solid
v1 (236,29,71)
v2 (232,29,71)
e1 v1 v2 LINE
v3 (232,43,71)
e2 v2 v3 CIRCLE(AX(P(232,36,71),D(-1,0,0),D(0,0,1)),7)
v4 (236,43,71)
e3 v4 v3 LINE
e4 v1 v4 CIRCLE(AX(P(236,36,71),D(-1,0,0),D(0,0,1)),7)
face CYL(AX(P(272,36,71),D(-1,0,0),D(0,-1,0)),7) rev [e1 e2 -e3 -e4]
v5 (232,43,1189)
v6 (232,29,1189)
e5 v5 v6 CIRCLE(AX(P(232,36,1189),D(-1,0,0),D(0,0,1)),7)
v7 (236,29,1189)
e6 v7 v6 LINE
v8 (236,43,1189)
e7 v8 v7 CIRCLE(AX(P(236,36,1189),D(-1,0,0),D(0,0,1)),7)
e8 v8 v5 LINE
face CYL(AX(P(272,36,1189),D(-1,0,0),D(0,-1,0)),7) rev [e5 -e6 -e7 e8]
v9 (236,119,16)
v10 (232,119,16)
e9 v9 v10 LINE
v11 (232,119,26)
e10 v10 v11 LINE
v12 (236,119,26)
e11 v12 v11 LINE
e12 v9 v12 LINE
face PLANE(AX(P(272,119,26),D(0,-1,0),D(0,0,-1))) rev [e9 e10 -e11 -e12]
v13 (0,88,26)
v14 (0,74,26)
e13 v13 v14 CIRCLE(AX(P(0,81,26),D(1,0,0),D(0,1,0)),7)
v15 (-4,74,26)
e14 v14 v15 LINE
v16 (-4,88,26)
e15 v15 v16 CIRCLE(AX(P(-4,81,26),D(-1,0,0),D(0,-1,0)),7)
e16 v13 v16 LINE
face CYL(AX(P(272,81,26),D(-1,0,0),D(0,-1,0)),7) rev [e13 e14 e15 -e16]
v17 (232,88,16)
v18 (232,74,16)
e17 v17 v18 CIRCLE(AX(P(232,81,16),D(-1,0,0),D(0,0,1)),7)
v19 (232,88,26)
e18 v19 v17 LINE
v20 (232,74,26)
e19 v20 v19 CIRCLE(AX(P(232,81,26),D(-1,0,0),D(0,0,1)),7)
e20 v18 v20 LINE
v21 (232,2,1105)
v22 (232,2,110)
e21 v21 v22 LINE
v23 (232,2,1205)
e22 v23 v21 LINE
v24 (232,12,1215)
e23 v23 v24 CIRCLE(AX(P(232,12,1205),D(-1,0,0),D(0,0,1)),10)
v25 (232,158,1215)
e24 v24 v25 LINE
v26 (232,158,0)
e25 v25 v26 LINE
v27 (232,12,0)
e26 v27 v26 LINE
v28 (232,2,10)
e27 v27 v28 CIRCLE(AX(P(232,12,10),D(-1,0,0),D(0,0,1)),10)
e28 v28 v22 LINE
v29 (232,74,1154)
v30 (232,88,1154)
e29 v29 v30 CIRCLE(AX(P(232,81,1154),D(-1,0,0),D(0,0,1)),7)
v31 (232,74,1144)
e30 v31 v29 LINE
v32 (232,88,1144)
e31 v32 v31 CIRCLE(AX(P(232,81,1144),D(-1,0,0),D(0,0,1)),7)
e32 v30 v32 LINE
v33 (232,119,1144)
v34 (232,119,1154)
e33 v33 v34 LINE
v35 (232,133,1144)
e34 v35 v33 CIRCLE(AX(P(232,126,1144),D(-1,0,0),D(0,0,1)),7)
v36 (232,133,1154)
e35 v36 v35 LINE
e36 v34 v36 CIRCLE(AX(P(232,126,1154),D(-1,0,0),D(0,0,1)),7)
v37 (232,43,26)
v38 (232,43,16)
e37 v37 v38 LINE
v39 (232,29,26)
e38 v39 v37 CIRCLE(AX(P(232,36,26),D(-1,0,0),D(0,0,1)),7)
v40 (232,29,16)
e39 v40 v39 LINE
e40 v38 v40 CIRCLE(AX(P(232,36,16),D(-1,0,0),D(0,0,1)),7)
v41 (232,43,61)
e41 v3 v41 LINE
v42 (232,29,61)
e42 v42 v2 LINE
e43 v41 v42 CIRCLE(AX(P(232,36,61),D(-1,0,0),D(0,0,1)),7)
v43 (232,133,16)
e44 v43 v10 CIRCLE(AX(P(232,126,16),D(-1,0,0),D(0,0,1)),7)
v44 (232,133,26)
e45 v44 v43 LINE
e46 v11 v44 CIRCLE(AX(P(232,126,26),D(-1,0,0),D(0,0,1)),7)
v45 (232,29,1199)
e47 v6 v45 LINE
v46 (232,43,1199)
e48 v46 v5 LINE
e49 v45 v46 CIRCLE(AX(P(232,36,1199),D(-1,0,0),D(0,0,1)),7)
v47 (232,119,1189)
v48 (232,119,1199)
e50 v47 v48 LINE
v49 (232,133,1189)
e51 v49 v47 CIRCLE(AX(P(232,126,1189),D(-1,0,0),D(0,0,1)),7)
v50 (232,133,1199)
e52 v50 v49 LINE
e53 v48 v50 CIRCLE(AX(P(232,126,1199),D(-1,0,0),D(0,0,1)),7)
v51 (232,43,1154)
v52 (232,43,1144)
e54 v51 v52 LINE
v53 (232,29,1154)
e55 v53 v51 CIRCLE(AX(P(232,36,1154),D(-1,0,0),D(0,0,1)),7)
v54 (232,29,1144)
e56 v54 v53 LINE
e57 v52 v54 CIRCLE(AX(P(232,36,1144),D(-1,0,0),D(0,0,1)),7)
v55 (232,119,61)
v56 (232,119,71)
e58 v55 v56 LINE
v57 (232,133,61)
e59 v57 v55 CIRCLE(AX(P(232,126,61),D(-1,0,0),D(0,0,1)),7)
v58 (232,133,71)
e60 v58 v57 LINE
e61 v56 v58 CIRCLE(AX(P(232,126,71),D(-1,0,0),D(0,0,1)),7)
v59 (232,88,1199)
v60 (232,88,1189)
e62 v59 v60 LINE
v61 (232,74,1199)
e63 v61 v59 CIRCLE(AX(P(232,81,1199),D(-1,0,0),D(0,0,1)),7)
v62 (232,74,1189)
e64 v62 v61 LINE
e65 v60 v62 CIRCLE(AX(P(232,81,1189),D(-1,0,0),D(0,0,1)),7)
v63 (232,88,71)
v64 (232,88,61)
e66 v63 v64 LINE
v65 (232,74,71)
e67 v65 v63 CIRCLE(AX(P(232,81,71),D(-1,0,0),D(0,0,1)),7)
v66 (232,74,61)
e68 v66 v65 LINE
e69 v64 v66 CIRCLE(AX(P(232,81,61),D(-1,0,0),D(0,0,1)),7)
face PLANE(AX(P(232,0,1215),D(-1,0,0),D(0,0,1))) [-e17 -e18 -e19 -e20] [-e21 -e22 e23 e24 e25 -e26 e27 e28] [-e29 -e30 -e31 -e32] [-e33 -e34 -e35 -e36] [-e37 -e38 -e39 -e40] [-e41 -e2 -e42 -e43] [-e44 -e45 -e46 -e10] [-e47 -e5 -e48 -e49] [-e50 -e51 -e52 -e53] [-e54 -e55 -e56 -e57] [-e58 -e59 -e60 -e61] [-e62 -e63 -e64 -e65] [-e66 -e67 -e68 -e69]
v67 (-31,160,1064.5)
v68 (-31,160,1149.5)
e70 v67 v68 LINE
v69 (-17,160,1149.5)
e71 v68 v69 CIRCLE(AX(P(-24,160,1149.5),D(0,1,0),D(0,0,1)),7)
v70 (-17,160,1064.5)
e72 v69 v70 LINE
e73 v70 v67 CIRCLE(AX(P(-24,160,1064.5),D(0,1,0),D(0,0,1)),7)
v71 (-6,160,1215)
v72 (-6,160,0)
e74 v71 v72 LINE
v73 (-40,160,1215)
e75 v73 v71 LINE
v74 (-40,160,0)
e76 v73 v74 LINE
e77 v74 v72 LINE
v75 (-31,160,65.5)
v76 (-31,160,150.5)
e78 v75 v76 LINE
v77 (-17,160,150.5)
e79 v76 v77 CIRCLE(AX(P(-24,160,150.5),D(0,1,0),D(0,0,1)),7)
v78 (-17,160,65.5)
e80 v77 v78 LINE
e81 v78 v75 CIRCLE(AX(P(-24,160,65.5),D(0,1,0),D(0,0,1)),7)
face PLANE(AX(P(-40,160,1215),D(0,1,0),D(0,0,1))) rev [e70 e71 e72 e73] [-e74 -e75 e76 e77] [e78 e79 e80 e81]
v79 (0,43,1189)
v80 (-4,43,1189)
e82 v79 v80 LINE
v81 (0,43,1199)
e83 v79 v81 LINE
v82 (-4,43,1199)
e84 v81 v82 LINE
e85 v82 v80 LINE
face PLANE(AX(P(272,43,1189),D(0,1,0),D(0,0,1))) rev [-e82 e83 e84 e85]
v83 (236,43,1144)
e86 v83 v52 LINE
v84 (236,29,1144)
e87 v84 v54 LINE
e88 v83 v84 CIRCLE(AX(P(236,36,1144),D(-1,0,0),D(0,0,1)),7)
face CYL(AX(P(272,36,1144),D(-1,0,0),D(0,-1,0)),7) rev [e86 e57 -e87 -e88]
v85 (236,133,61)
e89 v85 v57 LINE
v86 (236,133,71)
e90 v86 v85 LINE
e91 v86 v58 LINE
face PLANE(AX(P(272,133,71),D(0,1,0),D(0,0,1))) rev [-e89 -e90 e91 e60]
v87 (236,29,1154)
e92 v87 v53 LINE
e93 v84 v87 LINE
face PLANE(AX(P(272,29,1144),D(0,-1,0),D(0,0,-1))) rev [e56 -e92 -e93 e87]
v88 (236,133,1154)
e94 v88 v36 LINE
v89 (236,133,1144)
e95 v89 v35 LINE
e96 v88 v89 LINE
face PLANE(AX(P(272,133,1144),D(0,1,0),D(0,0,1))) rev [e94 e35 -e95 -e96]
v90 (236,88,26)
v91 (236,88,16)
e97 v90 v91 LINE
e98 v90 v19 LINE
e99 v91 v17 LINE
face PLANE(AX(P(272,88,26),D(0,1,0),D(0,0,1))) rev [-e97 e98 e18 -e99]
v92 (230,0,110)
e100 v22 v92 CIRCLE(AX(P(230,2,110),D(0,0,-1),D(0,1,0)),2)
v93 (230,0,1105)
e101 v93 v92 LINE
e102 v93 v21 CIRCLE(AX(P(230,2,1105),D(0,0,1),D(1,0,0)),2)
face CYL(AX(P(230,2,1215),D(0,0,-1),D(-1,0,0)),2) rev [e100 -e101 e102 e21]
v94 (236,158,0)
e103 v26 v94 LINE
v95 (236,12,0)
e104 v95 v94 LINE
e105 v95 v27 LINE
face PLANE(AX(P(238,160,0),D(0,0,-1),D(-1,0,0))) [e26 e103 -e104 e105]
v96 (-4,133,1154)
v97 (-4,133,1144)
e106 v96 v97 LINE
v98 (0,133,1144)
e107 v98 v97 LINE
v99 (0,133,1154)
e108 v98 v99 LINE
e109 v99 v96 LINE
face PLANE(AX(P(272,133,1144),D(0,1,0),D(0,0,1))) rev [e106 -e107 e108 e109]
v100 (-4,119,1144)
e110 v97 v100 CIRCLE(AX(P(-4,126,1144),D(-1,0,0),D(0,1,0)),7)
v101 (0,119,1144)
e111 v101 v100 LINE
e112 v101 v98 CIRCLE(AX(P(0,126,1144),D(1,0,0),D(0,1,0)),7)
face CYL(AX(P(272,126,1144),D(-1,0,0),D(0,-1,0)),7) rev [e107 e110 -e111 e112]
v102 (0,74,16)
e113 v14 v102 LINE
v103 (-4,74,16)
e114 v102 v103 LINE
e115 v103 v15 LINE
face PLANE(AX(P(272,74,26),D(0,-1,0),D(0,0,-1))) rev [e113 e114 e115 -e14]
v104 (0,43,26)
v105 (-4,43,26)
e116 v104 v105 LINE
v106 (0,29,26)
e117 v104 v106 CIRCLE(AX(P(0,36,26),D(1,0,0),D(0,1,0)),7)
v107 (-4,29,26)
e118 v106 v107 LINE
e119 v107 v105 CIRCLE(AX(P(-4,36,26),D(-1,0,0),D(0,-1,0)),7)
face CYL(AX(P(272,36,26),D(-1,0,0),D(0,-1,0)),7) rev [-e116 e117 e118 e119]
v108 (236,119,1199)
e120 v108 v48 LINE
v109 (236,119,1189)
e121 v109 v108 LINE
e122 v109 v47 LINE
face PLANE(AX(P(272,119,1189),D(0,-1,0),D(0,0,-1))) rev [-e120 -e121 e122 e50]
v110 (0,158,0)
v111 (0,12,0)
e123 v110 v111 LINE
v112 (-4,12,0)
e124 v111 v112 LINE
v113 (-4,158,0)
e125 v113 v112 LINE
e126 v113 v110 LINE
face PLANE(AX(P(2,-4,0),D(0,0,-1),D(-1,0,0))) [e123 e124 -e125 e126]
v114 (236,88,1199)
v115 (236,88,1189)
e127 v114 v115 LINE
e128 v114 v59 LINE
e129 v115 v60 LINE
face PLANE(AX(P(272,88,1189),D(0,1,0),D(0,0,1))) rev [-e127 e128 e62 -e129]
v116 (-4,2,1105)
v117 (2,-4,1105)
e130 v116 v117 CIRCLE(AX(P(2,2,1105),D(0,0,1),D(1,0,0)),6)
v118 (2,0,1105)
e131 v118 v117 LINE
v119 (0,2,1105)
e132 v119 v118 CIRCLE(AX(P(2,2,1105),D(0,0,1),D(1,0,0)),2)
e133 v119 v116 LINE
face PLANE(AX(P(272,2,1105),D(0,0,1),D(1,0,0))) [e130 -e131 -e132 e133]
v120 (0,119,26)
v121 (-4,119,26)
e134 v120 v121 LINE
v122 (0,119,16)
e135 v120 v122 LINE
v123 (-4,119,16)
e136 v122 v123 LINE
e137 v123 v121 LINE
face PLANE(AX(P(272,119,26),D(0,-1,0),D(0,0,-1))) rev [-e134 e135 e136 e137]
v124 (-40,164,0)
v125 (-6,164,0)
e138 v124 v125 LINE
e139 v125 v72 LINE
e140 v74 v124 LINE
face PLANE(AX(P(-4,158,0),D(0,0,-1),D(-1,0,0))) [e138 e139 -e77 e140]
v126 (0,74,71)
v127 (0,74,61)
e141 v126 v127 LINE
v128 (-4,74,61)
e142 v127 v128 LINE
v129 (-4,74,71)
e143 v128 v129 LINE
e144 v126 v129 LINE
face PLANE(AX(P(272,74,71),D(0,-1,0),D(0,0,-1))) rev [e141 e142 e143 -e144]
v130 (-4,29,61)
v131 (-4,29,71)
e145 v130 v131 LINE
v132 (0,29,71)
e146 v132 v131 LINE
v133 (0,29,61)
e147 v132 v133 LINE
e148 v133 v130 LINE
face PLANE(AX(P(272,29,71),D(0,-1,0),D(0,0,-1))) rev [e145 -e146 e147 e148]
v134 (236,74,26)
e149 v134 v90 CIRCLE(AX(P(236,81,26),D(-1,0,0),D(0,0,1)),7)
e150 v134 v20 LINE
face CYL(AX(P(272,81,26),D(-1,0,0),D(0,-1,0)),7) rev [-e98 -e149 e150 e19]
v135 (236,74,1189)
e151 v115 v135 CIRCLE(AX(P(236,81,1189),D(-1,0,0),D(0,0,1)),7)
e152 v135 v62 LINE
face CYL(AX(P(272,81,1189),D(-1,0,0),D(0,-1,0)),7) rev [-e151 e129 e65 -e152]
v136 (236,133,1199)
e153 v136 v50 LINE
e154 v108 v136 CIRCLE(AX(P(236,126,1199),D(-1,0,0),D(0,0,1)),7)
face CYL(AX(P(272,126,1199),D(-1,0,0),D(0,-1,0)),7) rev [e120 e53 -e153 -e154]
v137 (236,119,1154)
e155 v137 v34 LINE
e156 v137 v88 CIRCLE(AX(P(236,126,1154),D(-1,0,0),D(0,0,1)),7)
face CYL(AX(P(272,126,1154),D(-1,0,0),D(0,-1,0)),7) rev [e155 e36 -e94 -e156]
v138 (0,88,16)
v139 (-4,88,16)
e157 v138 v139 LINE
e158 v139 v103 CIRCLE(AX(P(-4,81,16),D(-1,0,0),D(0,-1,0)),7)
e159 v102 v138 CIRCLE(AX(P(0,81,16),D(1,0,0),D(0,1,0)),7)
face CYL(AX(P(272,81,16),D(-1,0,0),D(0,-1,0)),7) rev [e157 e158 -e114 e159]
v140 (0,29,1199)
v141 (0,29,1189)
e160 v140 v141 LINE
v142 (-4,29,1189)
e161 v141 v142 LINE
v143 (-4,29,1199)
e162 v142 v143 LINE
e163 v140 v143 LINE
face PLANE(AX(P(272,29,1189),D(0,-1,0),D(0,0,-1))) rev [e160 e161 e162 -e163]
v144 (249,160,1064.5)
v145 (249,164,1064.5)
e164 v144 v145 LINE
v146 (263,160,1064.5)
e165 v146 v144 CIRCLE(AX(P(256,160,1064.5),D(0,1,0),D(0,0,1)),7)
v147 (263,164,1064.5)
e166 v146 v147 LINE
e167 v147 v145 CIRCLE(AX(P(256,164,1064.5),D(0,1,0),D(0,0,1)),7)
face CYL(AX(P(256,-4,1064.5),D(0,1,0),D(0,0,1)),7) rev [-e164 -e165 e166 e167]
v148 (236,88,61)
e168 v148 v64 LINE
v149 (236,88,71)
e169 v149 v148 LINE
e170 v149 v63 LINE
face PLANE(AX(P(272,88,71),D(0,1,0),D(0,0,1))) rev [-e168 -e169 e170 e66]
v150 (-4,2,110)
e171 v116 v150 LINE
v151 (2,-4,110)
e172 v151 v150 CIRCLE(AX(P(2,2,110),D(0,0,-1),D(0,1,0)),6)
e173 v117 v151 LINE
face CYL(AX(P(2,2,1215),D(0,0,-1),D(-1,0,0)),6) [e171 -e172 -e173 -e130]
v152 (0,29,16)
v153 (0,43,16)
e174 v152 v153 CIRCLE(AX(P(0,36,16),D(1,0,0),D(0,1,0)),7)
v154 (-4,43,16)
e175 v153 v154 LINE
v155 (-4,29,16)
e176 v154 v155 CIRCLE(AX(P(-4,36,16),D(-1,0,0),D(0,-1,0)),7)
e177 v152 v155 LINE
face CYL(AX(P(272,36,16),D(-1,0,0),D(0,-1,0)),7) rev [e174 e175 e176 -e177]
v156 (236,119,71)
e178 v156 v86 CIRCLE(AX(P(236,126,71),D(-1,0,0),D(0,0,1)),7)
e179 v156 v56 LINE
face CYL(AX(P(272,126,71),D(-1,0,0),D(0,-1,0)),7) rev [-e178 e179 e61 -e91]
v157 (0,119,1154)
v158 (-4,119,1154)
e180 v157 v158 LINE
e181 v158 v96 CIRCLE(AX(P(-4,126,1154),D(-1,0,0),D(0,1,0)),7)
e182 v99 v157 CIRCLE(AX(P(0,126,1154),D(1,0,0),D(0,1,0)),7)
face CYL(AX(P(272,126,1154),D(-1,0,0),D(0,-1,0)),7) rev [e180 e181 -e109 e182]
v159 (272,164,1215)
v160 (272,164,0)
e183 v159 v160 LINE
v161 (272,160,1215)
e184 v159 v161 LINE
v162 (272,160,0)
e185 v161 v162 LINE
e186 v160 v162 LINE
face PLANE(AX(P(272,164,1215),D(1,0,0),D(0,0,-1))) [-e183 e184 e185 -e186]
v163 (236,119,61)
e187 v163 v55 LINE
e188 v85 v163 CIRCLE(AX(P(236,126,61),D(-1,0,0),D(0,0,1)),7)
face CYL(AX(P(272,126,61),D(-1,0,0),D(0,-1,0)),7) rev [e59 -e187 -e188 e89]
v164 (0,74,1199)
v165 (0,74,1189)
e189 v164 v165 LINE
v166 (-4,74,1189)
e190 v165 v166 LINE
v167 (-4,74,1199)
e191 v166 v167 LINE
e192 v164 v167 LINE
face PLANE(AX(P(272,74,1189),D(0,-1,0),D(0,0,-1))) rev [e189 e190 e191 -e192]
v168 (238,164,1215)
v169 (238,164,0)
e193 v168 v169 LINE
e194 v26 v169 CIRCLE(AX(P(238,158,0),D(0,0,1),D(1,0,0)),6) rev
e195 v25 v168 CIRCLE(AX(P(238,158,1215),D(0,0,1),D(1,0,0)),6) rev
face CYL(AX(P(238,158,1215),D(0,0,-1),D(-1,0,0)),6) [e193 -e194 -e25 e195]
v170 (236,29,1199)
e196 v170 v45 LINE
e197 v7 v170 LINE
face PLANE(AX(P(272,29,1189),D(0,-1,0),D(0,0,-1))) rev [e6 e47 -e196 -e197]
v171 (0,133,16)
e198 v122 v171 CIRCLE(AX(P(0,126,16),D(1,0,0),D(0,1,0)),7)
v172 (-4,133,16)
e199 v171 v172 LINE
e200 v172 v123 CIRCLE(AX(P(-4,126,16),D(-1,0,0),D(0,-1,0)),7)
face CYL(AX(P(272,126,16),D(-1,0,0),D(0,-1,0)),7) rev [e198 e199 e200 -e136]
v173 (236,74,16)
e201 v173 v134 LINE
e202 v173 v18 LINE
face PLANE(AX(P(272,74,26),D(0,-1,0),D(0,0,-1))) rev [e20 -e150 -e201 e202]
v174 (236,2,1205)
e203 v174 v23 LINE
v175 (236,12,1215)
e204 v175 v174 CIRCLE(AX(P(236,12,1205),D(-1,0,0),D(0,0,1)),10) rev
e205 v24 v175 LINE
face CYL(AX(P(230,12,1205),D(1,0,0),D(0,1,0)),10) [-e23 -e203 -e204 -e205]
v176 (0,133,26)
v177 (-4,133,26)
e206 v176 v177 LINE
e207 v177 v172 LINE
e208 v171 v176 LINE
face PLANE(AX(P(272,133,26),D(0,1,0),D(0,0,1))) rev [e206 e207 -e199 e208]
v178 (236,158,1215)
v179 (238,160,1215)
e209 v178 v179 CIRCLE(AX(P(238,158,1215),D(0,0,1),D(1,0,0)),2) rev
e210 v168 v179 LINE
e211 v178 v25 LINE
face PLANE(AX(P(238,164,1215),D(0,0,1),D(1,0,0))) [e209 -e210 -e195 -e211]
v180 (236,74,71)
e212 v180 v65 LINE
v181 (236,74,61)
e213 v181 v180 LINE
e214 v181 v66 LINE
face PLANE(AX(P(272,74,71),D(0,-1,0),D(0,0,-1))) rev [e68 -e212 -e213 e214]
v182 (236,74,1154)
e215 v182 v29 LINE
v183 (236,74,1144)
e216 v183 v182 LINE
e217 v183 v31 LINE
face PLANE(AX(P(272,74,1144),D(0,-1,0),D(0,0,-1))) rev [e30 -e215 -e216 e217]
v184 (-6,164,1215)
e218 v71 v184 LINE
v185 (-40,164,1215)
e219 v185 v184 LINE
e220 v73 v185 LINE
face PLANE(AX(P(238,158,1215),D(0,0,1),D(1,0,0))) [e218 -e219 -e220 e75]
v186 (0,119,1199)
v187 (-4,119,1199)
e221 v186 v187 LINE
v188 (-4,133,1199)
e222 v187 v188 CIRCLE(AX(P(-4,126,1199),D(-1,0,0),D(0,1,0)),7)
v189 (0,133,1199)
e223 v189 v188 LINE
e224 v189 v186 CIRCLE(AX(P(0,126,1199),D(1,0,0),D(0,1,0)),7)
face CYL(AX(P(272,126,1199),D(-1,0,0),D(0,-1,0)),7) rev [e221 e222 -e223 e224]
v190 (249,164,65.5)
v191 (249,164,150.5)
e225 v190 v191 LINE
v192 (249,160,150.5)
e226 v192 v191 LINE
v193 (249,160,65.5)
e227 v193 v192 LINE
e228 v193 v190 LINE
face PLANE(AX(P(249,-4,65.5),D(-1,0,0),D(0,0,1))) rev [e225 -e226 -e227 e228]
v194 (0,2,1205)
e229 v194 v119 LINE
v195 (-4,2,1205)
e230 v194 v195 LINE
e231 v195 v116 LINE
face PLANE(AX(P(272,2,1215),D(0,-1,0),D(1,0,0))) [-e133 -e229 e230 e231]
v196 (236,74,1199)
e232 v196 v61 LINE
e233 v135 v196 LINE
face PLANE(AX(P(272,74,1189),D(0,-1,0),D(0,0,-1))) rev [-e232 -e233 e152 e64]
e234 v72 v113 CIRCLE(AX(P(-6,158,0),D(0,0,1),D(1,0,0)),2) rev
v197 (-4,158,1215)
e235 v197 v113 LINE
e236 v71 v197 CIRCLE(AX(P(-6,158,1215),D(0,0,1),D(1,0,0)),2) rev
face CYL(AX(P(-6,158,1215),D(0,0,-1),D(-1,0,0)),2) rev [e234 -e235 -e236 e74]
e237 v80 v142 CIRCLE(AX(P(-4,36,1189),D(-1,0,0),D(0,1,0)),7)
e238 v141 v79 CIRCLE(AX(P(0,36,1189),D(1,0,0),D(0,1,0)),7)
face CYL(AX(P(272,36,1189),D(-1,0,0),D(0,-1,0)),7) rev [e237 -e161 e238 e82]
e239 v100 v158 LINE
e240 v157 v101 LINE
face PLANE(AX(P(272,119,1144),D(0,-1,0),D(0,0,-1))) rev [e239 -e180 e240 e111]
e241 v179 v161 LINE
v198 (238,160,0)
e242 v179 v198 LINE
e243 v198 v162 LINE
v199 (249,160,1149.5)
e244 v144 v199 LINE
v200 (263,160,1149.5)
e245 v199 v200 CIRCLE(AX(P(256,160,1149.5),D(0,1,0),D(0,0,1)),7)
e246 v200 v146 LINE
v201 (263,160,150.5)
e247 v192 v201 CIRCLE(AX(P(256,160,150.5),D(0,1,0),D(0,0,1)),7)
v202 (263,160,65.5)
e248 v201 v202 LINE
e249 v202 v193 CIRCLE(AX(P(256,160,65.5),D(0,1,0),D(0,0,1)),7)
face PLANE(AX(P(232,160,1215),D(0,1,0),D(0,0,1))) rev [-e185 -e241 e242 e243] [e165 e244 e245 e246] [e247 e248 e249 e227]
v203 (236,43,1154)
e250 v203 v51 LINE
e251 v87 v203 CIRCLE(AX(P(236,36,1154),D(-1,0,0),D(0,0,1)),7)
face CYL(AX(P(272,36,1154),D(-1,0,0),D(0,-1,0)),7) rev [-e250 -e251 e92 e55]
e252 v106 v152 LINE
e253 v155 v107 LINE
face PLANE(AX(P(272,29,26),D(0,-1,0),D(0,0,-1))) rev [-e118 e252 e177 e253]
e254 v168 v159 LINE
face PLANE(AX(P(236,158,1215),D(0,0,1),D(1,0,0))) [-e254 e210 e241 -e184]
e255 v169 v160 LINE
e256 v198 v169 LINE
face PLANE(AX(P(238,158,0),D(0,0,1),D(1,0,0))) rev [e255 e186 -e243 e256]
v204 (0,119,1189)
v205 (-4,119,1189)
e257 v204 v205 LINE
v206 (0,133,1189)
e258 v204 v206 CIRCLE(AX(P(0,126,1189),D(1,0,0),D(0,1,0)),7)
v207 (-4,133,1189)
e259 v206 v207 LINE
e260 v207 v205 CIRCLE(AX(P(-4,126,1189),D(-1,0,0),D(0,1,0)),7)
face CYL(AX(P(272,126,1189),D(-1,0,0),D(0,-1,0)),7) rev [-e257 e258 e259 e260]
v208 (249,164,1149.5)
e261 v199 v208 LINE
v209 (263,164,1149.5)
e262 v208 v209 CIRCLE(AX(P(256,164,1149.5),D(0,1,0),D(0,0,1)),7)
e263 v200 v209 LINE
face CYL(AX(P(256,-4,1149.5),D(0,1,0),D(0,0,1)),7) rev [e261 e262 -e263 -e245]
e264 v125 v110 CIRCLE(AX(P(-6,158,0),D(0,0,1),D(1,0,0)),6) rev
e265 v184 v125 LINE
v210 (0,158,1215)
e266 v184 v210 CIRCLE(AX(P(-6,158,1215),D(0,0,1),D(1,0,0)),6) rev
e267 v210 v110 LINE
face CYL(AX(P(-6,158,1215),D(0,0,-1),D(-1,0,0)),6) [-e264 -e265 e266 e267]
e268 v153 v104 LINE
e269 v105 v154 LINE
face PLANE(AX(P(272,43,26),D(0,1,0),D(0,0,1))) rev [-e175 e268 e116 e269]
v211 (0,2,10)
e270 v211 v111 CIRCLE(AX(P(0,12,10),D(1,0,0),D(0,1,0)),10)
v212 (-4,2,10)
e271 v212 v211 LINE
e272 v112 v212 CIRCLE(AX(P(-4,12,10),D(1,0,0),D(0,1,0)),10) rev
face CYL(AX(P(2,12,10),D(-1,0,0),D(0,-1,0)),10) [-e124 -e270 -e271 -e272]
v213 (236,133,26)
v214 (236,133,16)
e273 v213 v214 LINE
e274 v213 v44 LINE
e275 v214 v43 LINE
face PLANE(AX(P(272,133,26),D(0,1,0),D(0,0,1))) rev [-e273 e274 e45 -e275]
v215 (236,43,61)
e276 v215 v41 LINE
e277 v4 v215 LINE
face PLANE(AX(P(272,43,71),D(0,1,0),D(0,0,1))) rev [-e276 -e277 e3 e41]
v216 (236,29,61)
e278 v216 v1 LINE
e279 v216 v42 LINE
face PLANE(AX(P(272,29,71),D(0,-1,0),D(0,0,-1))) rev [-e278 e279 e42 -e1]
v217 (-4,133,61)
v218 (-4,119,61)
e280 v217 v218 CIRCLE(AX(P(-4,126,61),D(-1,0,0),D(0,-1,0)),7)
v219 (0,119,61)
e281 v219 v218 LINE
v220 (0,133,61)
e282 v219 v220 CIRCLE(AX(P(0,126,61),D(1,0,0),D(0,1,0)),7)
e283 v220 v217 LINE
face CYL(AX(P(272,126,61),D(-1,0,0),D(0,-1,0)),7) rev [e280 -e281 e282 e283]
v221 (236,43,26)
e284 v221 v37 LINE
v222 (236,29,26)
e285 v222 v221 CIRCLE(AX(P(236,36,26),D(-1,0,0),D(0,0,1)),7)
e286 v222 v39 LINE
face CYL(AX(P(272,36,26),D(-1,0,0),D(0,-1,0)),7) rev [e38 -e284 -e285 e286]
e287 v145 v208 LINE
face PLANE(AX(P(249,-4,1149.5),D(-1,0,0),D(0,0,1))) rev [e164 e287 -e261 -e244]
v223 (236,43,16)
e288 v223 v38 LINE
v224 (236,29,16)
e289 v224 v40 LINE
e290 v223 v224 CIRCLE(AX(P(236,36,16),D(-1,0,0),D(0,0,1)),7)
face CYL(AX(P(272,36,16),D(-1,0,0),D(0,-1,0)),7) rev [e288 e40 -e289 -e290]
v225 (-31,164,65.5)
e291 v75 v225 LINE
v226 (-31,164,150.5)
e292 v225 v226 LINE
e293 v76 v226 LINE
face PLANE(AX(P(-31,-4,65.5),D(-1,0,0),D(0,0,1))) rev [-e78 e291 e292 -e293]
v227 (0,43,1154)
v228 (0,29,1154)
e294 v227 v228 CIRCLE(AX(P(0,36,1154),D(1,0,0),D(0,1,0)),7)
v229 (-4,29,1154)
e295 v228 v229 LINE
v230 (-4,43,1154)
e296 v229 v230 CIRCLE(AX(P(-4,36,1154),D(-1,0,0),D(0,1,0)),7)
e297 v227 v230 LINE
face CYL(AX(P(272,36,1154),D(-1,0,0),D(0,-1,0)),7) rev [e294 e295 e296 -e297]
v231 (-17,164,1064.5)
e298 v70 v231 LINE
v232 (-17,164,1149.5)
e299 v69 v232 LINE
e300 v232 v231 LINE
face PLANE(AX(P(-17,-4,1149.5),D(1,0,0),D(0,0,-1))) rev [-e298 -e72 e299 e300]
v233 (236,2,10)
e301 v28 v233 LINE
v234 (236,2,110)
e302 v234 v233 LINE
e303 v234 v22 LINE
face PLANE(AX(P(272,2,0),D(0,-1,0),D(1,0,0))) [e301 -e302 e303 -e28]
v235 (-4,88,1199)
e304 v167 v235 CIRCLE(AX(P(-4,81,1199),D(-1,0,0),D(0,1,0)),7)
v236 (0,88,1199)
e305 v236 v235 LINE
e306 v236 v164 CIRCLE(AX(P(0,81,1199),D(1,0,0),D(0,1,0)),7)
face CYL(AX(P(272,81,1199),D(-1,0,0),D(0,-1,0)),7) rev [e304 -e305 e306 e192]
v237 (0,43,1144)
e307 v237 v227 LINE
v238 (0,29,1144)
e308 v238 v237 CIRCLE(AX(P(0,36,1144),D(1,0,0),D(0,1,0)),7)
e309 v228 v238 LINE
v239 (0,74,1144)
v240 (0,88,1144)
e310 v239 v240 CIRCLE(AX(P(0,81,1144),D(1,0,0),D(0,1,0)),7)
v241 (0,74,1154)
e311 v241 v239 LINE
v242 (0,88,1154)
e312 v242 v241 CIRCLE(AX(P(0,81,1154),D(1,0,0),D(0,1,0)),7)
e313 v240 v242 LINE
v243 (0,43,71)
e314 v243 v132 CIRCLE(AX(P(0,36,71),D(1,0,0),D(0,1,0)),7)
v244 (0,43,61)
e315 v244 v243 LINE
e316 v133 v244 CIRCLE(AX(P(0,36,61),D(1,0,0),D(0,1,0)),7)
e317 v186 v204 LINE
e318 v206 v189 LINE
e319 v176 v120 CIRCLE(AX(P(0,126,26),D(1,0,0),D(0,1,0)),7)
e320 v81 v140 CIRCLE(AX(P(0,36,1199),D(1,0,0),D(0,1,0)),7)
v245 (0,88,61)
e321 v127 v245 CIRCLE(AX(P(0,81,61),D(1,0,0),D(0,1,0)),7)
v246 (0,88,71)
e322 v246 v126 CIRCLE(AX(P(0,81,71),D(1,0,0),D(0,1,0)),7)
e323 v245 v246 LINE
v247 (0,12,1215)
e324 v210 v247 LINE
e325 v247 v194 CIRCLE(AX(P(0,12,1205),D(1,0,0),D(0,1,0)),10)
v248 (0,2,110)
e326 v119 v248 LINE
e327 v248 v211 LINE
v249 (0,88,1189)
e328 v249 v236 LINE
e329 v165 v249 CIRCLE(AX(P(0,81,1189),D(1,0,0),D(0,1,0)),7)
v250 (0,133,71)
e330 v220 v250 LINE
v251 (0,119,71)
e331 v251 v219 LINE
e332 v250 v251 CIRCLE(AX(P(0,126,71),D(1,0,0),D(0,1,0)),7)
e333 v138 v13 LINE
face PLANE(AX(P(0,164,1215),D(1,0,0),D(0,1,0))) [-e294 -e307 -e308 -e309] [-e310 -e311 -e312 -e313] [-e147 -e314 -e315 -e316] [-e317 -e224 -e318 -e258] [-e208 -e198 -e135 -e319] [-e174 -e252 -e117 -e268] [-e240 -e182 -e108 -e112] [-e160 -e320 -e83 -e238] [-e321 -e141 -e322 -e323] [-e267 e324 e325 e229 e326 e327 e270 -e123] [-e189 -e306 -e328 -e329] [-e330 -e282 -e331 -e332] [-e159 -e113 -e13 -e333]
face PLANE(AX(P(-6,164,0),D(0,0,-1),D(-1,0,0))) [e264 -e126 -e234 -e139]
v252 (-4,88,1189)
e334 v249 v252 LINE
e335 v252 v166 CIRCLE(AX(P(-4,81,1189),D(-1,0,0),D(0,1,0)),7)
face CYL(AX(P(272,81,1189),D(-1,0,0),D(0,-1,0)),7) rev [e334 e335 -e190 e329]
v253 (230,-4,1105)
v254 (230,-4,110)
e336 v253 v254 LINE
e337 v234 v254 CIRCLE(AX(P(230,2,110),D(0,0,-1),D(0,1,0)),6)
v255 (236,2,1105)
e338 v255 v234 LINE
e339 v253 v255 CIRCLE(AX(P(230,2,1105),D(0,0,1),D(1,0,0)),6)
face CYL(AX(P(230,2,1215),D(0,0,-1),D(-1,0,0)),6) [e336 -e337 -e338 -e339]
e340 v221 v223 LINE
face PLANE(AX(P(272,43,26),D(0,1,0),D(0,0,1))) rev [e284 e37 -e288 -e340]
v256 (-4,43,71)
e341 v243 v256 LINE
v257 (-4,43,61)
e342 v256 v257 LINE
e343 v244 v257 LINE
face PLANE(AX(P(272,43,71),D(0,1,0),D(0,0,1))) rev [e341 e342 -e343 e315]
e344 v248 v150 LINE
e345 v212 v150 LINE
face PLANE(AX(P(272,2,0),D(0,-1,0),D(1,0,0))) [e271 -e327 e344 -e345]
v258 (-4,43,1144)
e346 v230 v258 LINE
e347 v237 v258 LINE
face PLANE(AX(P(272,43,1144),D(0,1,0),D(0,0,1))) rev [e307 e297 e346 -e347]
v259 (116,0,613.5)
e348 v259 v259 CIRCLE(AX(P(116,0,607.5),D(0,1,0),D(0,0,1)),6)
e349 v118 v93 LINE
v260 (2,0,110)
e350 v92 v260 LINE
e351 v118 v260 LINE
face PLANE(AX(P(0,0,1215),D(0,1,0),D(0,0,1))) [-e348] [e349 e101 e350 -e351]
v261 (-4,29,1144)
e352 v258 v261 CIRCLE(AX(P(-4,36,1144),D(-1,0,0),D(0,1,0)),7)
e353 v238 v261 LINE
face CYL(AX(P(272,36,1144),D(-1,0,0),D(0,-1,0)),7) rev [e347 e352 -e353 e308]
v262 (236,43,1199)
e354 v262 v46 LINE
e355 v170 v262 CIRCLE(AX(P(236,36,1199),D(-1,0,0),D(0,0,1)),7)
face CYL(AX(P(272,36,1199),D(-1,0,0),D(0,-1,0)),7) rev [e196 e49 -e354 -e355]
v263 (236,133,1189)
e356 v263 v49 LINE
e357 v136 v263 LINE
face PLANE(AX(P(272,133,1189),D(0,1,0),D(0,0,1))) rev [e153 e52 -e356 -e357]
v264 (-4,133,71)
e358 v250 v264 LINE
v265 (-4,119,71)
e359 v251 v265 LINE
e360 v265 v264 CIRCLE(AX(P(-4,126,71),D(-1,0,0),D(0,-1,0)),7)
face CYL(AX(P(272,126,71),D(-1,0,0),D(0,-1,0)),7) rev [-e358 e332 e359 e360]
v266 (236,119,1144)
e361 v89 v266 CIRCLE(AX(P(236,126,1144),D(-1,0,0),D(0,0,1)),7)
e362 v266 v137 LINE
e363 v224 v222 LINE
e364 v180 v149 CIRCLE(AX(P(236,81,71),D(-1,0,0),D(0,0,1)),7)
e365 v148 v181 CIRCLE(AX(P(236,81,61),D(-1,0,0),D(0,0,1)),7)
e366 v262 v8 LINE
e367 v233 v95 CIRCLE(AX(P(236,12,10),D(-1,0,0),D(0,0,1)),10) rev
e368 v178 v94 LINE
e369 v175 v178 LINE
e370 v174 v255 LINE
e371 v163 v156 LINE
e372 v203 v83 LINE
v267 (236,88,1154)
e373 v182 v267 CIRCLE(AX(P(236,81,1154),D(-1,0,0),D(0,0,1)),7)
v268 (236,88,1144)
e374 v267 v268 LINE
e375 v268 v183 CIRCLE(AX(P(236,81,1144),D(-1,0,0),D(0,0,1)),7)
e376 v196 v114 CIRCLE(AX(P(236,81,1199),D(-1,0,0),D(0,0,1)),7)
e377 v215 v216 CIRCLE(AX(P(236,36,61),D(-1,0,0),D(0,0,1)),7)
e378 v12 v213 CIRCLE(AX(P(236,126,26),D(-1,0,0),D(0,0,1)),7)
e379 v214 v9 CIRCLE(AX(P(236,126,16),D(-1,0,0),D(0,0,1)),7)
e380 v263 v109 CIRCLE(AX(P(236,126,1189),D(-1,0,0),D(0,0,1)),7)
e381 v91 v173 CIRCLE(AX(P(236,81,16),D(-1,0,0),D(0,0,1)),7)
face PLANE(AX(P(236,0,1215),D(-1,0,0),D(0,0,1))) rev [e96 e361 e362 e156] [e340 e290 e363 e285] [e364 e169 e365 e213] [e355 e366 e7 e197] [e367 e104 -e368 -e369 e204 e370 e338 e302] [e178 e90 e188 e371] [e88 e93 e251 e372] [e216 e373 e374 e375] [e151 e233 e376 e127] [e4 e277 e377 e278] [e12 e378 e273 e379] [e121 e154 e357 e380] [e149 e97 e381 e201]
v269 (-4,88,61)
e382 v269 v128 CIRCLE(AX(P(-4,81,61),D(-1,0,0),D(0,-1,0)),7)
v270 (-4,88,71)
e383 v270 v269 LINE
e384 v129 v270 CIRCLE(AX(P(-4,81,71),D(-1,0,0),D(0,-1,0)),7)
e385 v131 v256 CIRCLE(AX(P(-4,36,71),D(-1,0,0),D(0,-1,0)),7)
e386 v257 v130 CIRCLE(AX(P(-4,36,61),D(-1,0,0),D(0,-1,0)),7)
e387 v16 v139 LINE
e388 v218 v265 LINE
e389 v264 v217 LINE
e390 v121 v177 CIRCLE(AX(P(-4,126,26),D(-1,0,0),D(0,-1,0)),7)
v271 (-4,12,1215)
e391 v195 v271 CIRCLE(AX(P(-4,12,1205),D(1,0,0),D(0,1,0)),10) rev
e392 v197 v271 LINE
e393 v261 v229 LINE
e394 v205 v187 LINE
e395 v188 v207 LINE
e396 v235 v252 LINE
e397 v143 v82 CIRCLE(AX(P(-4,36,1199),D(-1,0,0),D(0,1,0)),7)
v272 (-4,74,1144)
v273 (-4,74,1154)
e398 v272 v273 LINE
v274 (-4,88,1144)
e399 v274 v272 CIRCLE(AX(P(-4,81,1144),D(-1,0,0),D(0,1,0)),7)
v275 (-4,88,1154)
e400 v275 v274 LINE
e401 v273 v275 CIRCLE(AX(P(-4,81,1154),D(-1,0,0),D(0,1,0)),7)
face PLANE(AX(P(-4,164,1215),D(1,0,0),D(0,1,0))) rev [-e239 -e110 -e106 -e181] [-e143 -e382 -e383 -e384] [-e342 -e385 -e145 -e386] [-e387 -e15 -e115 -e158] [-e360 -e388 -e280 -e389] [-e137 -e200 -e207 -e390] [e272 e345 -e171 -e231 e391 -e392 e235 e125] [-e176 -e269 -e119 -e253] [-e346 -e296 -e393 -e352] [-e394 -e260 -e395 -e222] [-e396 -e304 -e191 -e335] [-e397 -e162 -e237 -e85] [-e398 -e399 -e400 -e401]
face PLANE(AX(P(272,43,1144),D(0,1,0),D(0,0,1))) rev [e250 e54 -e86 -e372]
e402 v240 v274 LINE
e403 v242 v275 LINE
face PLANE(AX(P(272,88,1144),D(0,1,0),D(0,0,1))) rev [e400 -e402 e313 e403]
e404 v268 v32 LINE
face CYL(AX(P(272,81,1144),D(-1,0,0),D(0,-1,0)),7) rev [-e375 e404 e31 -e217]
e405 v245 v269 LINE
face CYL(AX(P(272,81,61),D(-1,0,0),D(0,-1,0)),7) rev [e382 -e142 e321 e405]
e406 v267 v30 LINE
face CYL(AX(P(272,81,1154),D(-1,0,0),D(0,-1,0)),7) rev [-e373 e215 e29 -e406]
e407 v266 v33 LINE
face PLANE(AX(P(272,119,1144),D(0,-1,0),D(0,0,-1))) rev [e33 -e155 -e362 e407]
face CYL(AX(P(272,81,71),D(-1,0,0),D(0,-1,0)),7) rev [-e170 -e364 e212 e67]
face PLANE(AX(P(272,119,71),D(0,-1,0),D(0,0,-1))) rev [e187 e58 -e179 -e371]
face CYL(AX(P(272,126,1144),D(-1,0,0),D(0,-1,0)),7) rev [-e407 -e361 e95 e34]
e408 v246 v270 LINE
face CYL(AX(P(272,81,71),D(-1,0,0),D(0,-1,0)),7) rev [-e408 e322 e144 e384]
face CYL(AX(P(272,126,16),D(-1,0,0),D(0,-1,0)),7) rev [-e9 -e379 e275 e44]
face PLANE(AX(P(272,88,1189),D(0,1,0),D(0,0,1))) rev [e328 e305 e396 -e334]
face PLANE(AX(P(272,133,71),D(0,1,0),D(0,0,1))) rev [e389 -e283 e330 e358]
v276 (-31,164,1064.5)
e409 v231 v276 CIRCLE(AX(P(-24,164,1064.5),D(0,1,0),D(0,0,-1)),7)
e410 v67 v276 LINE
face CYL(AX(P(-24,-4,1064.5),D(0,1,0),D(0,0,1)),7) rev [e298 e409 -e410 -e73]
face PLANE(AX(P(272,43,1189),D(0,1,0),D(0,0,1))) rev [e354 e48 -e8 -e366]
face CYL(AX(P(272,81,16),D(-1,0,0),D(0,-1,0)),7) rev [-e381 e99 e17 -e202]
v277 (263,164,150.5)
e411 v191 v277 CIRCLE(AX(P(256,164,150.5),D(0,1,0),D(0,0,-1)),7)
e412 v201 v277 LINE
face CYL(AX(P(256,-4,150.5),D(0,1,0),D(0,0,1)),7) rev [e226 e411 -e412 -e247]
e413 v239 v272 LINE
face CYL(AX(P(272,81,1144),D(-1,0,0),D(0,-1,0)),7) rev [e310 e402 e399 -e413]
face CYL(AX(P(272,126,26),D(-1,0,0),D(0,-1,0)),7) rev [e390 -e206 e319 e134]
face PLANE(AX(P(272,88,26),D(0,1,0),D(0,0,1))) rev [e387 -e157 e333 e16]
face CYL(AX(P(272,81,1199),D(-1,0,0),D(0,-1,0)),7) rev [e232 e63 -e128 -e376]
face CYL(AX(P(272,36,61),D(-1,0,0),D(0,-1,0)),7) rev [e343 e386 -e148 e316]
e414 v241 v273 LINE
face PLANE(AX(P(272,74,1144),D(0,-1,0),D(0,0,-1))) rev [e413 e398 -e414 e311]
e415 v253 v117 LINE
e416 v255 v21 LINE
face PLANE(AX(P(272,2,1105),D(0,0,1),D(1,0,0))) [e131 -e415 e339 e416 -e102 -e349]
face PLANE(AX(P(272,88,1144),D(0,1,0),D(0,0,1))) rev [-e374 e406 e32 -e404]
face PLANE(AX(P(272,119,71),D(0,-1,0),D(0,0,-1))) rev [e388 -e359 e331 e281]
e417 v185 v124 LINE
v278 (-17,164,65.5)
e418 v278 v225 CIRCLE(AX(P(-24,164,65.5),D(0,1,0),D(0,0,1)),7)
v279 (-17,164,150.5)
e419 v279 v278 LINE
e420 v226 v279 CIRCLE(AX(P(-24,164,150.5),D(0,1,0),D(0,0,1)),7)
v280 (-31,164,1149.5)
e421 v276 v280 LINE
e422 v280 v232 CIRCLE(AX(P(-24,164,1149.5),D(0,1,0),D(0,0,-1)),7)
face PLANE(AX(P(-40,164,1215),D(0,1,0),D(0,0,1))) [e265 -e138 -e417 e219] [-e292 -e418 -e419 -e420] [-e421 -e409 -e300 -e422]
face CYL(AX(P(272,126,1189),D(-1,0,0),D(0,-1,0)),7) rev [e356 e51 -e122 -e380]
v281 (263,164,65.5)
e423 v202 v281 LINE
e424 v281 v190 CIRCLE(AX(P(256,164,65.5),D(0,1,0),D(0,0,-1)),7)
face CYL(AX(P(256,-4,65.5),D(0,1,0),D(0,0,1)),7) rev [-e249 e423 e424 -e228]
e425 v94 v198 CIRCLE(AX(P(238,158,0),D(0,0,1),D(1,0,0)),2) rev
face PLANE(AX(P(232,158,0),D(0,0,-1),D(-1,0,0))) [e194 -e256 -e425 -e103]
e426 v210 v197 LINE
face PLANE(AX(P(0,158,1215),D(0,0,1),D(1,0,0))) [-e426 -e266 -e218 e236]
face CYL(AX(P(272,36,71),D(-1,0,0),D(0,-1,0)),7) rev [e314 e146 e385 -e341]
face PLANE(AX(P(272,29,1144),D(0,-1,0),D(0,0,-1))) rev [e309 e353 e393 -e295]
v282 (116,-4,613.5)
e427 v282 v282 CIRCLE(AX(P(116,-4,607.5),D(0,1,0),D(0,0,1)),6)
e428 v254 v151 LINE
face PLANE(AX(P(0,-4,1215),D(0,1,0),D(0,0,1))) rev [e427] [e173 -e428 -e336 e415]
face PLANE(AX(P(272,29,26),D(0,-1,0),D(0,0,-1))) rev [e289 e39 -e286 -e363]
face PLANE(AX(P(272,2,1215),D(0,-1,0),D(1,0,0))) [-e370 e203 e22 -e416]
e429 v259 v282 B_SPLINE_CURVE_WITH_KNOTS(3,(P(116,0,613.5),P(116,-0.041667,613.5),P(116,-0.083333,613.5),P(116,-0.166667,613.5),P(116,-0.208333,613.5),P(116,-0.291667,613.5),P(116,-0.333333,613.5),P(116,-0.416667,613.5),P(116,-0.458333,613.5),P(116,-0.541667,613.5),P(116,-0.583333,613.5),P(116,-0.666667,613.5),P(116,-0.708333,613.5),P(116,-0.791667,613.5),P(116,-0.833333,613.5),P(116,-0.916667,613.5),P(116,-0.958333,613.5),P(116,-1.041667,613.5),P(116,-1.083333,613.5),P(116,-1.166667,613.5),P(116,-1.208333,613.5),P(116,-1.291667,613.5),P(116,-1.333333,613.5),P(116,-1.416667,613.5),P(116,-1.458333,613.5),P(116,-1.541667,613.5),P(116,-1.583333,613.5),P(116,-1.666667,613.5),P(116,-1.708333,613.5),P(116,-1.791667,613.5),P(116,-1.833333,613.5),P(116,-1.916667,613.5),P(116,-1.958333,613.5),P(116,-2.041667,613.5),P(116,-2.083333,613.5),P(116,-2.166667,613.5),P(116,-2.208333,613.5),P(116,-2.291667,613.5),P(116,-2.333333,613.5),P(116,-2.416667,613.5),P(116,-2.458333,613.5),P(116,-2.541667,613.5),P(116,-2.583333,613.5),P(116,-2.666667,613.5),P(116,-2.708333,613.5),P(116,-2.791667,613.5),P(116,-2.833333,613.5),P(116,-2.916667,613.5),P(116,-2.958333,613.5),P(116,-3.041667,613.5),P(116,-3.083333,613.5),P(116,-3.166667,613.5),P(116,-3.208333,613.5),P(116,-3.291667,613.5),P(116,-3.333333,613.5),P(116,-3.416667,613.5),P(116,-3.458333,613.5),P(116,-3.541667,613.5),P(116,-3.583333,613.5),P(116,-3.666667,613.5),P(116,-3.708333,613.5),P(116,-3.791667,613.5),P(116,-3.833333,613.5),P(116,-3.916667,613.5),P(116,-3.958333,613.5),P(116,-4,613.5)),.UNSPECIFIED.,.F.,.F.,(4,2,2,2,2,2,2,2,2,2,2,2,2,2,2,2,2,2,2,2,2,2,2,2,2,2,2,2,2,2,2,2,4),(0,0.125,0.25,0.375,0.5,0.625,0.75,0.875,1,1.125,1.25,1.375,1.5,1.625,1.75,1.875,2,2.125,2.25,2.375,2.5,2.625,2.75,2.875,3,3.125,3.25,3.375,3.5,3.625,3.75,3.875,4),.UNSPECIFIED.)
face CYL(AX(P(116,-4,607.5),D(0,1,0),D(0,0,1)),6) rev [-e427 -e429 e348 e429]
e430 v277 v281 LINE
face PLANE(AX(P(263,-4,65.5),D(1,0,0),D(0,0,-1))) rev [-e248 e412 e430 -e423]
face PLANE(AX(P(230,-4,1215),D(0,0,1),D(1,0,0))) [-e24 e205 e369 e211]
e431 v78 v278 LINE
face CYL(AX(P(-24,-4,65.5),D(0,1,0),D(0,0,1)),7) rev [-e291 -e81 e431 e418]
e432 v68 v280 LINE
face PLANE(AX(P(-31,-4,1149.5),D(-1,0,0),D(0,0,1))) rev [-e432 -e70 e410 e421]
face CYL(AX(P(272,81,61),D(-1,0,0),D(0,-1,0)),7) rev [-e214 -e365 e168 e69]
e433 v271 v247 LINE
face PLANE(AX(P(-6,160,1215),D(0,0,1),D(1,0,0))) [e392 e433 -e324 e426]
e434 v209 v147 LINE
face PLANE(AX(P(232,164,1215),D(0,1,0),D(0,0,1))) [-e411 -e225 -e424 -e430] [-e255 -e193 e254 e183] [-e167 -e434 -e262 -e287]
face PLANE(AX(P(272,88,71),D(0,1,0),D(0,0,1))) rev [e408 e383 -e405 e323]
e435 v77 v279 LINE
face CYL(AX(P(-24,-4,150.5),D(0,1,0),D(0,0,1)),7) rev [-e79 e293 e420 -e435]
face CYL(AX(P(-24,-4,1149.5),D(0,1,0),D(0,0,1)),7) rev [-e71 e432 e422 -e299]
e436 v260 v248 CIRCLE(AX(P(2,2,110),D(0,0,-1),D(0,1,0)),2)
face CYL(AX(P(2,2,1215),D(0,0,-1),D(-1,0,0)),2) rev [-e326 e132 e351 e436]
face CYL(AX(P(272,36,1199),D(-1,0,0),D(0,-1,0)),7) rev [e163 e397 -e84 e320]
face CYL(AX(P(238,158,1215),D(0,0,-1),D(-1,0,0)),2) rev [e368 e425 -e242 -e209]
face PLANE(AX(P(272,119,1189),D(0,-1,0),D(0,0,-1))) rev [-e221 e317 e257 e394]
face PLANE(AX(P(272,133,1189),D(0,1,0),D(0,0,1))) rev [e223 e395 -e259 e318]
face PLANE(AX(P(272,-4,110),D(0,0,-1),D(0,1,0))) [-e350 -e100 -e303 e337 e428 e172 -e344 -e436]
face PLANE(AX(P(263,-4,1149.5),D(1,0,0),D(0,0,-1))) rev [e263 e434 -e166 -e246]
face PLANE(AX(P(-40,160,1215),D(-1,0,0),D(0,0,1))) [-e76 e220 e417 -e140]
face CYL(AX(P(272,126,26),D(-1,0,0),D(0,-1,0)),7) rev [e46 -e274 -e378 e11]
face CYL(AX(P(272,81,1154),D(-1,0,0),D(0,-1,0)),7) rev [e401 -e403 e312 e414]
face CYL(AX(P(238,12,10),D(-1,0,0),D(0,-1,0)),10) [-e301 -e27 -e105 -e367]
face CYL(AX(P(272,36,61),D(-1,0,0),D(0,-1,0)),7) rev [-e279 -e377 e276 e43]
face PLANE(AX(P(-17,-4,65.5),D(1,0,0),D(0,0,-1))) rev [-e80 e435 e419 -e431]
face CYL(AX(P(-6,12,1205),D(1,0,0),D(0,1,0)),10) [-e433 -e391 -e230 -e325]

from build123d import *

# Parameters (mm, degrees)
BASE_FLANGE1_DEPTH = 1215
SKETCH6_W          = 110
SKETCH6_H          = 6
CUT_EXTRUDE1_DEPTH = 1257.7008395
CUT_EXTRUDE2_DEPTH = 1257.7008395
SKETCH8_R          = 6
CUT_EXTRUDE3_DEPTH = 1257.357035241
FILLET1_R          = 10


# Sheet-metal steps are written as plain solids
with BuildPart() as part:
    # Sketch1 → Base-Flange1 (new body)
    with BuildSketch(Plane.XY):
        with BuildLine():
            Line((-40, 164), (-6, 164))
            ThreePointArc((-6, 164), (-1.757359313, 162.242640687), (0, 158))
            Line((0, 158), (0, 2))
            ThreePointArc((0, 2), (0.585786438, 0.585786438), (2, 0))
            Line((2, 0), (230, 0))
            ThreePointArc((230, 0), (231.414213562, 0.585786438), (232, 2))
            Line((232, 2), (232, 158))
            ThreePointArc((232, 158), (233.757359313, 162.242640687), (238, 164))
            Line((238, 164), (272, 164))
            Line((272, 164), (272, 160))
            Line((272, 160), (238, 160))
            ThreePointArc((238, 160), (236.585786438, 159.414213562), (236, 158))
            Line((236, 158), (236, 2))
            ThreePointArc((236, 2), (234.242640687, -2.242640687), (230, -4))
            Line((230, -4), (2, -4))
            ThreePointArc((2, -4), (-2.242640687, -2.242640687), (-4, 2))
            Line((-4, 2), (-4, 158))
            ThreePointArc((-4, 158), (-4.585786438, 159.414213562), (-6, 160))
            Line((-6, 160), (-40, 160))
            Line((-40, 160), (-40, 164))
        make_face()
    extrude(amount=BASE_FLANGE1_DEPTH)

    # Sketch6 → Cut-Extrude1 (cut, through all)
    with BuildSketch(Plane(origin=(-4, 0, 0), x_dir=(0, 0, -1), z_dir=(1, 0, 0))):
        with Locations((-55, -1)):
            Rectangle(SKETCH6_W, SKETCH6_H)
        with Locations((-1160, -1)):
            Rectangle(SKETCH6_W, SKETCH6_H)
    extrude(amount=CUT_EXTRUDE1_DEPTH, mode=Mode.SUBTRACT)

    # Sketch7 → Cut-Extrude2 (cut, through all)
    with BuildSketch(Plane.ZY.offset(4)):
        with BuildLine():
            Line((26, 119), (16, 119))
            ThreePointArc((16, 119), (9, 126), (16, 133))
            Line((16, 133), (26, 133))
            ThreePointArc((26, 133), (33, 126), (26, 119))
        make_face()
        with BuildLine():
            Line((71, 119), (61, 119))
            ThreePointArc((61, 119), (54, 126), (61, 133))
            Line((61, 133), (71, 133))
            ThreePointArc((71, 133), (78, 126), (71, 119))
        make_face()
        with BuildLine():
            Line((71, 74), (61, 74))
            ThreePointArc((61, 74), (54, 81), (61, 88))
            Line((61, 88), (71, 88))
            ThreePointArc((71, 88), (78, 81), (71, 74))
        make_face()
        with BuildLine():
            Line((71, 29), (61, 29))
            ThreePointArc((61, 29), (54, 36), (61, 43))
            Line((61, 43), (71, 43))
            ThreePointArc((71, 43), (78, 36), (71, 29))
        make_face()
        with BuildLine():
            Line((26, 74), (16, 74))
            ThreePointArc((16, 74), (9, 81), (16, 88))
            Line((16, 88), (26, 88))
            ThreePointArc((26, 88), (33, 81), (26, 74))
        make_face()
        with BuildLine():
            Line((26, 29), (16, 29))
            ThreePointArc((16, 29), (9, 36), (16, 43))
            Line((16, 43), (26, 43))
            ThreePointArc((26, 43), (33, 36), (26, 29))
        make_face()
        with BuildLine():
            Line((1189, 119), (1199, 119))
            ThreePointArc((1199, 119), (1206, 126), (1199, 133))
            Line((1199, 133), (1189, 133))
            ThreePointArc((1189, 133), (1182, 126), (1189, 119))
        make_face()
        with BuildLine():
            Line((1144, 119), (1154, 119))
            ThreePointArc((1154, 119), (1161, 126), (1154, 133))
            Line((1154, 133), (1144, 133))
            ThreePointArc((1144, 133), (1137, 126), (1144, 119))
        make_face()
        with BuildLine():
            Line((1144, 74), (1154, 74))
            ThreePointArc((1154, 74), (1161, 81), (1154, 88))
            Line((1154, 88), (1144, 88))
            ThreePointArc((1144, 88), (1137, 81), (1144, 74))
        make_face()
        with BuildLine():
            Line((1144, 29), (1154, 29))
            ThreePointArc((1154, 29), (1161, 36), (1154, 43))
            Line((1154, 43), (1144, 43))
            ThreePointArc((1144, 43), (1137, 36), (1144, 29))
        make_face()
        with BuildLine():
            Line((1189, 74), (1199, 74))
            ThreePointArc((1199, 74), (1206, 81), (1199, 88))
            Line((1199, 88), (1189, 88))
            ThreePointArc((1189, 88), (1182, 81), (1189, 74))
        make_face()
        with BuildLine():
            Line((1189, 29), (1199, 29))
            ThreePointArc((1199, 29), (1206, 36), (1199, 43))
            Line((1199, 43), (1189, 43))
            ThreePointArc((1189, 43), (1182, 36), (1189, 29))
        make_face()
    extrude(amount=-CUT_EXTRUDE2_DEPTH, mode=Mode.SUBTRACT)

    # Sketch8 → Cut-Extrude3 (cut, through all)
    with BuildSketch(Plane(origin=(0, 164, 0), x_dir=(1, 0, 0), z_dir=(0, 1, 0))):
        with Locations(Location((116, -607.5, 0), (0, 0, 270))):
            Circle(SKETCH8_R)
        with BuildLine():
            Line((249, -1149.5), (249, -1064.5))
            ThreePointArc((249, -1064.5), (256, -1057.5), (263, -1064.5))
            Line((263, -1064.5), (263, -1149.5))
            ThreePointArc((263, -1149.5), (256, -1156.5), (249, -1149.5))
        make_face()
        with BuildLine():
            Line((249, -65.5), (249, -150.5))
            ThreePointArc((249, -150.5), (256, -157.5), (263, -150.5))
            Line((263, -150.5), (263, -65.5))
            ThreePointArc((263, -65.5), (256, -58.5), (249, -65.5))
        make_face()
        with BuildLine():
            Line((-17, -65.5), (-17, -150.5))
            ThreePointArc((-17, -150.5), (-24, -157.5), (-31, -150.5))
            Line((-31, -150.5), (-31, -65.5))
            ThreePointArc((-31, -65.5), (-24, -58.5), (-17, -65.5))
        make_face()
        with BuildLine():
            Line((-17, -1149.5), (-17, -1064.5))
            ThreePointArc((-17, -1064.5), (-24, -1057.5), (-31, -1064.5))
            Line((-31, -1064.5), (-31, -1149.5))
            ThreePointArc((-31, -1149.5), (-24, -1156.5), (-17, -1149.5))
        make_face()
    extrude(amount=-CUT_EXTRUDE3_DEPTH, mode=Mode.SUBTRACT)

    # Fillet1
    fillet1_edges = [part.edges().sort_by_distance(p)[0] for p in [
        (234, 2, 0),
        (234, 2, 1215),
        (-2, 2, 0),
        (-2, 2, 1215),
    ]]
    fillet(fillet1_edges, radius=FILLET1_R)


solid = part.part
